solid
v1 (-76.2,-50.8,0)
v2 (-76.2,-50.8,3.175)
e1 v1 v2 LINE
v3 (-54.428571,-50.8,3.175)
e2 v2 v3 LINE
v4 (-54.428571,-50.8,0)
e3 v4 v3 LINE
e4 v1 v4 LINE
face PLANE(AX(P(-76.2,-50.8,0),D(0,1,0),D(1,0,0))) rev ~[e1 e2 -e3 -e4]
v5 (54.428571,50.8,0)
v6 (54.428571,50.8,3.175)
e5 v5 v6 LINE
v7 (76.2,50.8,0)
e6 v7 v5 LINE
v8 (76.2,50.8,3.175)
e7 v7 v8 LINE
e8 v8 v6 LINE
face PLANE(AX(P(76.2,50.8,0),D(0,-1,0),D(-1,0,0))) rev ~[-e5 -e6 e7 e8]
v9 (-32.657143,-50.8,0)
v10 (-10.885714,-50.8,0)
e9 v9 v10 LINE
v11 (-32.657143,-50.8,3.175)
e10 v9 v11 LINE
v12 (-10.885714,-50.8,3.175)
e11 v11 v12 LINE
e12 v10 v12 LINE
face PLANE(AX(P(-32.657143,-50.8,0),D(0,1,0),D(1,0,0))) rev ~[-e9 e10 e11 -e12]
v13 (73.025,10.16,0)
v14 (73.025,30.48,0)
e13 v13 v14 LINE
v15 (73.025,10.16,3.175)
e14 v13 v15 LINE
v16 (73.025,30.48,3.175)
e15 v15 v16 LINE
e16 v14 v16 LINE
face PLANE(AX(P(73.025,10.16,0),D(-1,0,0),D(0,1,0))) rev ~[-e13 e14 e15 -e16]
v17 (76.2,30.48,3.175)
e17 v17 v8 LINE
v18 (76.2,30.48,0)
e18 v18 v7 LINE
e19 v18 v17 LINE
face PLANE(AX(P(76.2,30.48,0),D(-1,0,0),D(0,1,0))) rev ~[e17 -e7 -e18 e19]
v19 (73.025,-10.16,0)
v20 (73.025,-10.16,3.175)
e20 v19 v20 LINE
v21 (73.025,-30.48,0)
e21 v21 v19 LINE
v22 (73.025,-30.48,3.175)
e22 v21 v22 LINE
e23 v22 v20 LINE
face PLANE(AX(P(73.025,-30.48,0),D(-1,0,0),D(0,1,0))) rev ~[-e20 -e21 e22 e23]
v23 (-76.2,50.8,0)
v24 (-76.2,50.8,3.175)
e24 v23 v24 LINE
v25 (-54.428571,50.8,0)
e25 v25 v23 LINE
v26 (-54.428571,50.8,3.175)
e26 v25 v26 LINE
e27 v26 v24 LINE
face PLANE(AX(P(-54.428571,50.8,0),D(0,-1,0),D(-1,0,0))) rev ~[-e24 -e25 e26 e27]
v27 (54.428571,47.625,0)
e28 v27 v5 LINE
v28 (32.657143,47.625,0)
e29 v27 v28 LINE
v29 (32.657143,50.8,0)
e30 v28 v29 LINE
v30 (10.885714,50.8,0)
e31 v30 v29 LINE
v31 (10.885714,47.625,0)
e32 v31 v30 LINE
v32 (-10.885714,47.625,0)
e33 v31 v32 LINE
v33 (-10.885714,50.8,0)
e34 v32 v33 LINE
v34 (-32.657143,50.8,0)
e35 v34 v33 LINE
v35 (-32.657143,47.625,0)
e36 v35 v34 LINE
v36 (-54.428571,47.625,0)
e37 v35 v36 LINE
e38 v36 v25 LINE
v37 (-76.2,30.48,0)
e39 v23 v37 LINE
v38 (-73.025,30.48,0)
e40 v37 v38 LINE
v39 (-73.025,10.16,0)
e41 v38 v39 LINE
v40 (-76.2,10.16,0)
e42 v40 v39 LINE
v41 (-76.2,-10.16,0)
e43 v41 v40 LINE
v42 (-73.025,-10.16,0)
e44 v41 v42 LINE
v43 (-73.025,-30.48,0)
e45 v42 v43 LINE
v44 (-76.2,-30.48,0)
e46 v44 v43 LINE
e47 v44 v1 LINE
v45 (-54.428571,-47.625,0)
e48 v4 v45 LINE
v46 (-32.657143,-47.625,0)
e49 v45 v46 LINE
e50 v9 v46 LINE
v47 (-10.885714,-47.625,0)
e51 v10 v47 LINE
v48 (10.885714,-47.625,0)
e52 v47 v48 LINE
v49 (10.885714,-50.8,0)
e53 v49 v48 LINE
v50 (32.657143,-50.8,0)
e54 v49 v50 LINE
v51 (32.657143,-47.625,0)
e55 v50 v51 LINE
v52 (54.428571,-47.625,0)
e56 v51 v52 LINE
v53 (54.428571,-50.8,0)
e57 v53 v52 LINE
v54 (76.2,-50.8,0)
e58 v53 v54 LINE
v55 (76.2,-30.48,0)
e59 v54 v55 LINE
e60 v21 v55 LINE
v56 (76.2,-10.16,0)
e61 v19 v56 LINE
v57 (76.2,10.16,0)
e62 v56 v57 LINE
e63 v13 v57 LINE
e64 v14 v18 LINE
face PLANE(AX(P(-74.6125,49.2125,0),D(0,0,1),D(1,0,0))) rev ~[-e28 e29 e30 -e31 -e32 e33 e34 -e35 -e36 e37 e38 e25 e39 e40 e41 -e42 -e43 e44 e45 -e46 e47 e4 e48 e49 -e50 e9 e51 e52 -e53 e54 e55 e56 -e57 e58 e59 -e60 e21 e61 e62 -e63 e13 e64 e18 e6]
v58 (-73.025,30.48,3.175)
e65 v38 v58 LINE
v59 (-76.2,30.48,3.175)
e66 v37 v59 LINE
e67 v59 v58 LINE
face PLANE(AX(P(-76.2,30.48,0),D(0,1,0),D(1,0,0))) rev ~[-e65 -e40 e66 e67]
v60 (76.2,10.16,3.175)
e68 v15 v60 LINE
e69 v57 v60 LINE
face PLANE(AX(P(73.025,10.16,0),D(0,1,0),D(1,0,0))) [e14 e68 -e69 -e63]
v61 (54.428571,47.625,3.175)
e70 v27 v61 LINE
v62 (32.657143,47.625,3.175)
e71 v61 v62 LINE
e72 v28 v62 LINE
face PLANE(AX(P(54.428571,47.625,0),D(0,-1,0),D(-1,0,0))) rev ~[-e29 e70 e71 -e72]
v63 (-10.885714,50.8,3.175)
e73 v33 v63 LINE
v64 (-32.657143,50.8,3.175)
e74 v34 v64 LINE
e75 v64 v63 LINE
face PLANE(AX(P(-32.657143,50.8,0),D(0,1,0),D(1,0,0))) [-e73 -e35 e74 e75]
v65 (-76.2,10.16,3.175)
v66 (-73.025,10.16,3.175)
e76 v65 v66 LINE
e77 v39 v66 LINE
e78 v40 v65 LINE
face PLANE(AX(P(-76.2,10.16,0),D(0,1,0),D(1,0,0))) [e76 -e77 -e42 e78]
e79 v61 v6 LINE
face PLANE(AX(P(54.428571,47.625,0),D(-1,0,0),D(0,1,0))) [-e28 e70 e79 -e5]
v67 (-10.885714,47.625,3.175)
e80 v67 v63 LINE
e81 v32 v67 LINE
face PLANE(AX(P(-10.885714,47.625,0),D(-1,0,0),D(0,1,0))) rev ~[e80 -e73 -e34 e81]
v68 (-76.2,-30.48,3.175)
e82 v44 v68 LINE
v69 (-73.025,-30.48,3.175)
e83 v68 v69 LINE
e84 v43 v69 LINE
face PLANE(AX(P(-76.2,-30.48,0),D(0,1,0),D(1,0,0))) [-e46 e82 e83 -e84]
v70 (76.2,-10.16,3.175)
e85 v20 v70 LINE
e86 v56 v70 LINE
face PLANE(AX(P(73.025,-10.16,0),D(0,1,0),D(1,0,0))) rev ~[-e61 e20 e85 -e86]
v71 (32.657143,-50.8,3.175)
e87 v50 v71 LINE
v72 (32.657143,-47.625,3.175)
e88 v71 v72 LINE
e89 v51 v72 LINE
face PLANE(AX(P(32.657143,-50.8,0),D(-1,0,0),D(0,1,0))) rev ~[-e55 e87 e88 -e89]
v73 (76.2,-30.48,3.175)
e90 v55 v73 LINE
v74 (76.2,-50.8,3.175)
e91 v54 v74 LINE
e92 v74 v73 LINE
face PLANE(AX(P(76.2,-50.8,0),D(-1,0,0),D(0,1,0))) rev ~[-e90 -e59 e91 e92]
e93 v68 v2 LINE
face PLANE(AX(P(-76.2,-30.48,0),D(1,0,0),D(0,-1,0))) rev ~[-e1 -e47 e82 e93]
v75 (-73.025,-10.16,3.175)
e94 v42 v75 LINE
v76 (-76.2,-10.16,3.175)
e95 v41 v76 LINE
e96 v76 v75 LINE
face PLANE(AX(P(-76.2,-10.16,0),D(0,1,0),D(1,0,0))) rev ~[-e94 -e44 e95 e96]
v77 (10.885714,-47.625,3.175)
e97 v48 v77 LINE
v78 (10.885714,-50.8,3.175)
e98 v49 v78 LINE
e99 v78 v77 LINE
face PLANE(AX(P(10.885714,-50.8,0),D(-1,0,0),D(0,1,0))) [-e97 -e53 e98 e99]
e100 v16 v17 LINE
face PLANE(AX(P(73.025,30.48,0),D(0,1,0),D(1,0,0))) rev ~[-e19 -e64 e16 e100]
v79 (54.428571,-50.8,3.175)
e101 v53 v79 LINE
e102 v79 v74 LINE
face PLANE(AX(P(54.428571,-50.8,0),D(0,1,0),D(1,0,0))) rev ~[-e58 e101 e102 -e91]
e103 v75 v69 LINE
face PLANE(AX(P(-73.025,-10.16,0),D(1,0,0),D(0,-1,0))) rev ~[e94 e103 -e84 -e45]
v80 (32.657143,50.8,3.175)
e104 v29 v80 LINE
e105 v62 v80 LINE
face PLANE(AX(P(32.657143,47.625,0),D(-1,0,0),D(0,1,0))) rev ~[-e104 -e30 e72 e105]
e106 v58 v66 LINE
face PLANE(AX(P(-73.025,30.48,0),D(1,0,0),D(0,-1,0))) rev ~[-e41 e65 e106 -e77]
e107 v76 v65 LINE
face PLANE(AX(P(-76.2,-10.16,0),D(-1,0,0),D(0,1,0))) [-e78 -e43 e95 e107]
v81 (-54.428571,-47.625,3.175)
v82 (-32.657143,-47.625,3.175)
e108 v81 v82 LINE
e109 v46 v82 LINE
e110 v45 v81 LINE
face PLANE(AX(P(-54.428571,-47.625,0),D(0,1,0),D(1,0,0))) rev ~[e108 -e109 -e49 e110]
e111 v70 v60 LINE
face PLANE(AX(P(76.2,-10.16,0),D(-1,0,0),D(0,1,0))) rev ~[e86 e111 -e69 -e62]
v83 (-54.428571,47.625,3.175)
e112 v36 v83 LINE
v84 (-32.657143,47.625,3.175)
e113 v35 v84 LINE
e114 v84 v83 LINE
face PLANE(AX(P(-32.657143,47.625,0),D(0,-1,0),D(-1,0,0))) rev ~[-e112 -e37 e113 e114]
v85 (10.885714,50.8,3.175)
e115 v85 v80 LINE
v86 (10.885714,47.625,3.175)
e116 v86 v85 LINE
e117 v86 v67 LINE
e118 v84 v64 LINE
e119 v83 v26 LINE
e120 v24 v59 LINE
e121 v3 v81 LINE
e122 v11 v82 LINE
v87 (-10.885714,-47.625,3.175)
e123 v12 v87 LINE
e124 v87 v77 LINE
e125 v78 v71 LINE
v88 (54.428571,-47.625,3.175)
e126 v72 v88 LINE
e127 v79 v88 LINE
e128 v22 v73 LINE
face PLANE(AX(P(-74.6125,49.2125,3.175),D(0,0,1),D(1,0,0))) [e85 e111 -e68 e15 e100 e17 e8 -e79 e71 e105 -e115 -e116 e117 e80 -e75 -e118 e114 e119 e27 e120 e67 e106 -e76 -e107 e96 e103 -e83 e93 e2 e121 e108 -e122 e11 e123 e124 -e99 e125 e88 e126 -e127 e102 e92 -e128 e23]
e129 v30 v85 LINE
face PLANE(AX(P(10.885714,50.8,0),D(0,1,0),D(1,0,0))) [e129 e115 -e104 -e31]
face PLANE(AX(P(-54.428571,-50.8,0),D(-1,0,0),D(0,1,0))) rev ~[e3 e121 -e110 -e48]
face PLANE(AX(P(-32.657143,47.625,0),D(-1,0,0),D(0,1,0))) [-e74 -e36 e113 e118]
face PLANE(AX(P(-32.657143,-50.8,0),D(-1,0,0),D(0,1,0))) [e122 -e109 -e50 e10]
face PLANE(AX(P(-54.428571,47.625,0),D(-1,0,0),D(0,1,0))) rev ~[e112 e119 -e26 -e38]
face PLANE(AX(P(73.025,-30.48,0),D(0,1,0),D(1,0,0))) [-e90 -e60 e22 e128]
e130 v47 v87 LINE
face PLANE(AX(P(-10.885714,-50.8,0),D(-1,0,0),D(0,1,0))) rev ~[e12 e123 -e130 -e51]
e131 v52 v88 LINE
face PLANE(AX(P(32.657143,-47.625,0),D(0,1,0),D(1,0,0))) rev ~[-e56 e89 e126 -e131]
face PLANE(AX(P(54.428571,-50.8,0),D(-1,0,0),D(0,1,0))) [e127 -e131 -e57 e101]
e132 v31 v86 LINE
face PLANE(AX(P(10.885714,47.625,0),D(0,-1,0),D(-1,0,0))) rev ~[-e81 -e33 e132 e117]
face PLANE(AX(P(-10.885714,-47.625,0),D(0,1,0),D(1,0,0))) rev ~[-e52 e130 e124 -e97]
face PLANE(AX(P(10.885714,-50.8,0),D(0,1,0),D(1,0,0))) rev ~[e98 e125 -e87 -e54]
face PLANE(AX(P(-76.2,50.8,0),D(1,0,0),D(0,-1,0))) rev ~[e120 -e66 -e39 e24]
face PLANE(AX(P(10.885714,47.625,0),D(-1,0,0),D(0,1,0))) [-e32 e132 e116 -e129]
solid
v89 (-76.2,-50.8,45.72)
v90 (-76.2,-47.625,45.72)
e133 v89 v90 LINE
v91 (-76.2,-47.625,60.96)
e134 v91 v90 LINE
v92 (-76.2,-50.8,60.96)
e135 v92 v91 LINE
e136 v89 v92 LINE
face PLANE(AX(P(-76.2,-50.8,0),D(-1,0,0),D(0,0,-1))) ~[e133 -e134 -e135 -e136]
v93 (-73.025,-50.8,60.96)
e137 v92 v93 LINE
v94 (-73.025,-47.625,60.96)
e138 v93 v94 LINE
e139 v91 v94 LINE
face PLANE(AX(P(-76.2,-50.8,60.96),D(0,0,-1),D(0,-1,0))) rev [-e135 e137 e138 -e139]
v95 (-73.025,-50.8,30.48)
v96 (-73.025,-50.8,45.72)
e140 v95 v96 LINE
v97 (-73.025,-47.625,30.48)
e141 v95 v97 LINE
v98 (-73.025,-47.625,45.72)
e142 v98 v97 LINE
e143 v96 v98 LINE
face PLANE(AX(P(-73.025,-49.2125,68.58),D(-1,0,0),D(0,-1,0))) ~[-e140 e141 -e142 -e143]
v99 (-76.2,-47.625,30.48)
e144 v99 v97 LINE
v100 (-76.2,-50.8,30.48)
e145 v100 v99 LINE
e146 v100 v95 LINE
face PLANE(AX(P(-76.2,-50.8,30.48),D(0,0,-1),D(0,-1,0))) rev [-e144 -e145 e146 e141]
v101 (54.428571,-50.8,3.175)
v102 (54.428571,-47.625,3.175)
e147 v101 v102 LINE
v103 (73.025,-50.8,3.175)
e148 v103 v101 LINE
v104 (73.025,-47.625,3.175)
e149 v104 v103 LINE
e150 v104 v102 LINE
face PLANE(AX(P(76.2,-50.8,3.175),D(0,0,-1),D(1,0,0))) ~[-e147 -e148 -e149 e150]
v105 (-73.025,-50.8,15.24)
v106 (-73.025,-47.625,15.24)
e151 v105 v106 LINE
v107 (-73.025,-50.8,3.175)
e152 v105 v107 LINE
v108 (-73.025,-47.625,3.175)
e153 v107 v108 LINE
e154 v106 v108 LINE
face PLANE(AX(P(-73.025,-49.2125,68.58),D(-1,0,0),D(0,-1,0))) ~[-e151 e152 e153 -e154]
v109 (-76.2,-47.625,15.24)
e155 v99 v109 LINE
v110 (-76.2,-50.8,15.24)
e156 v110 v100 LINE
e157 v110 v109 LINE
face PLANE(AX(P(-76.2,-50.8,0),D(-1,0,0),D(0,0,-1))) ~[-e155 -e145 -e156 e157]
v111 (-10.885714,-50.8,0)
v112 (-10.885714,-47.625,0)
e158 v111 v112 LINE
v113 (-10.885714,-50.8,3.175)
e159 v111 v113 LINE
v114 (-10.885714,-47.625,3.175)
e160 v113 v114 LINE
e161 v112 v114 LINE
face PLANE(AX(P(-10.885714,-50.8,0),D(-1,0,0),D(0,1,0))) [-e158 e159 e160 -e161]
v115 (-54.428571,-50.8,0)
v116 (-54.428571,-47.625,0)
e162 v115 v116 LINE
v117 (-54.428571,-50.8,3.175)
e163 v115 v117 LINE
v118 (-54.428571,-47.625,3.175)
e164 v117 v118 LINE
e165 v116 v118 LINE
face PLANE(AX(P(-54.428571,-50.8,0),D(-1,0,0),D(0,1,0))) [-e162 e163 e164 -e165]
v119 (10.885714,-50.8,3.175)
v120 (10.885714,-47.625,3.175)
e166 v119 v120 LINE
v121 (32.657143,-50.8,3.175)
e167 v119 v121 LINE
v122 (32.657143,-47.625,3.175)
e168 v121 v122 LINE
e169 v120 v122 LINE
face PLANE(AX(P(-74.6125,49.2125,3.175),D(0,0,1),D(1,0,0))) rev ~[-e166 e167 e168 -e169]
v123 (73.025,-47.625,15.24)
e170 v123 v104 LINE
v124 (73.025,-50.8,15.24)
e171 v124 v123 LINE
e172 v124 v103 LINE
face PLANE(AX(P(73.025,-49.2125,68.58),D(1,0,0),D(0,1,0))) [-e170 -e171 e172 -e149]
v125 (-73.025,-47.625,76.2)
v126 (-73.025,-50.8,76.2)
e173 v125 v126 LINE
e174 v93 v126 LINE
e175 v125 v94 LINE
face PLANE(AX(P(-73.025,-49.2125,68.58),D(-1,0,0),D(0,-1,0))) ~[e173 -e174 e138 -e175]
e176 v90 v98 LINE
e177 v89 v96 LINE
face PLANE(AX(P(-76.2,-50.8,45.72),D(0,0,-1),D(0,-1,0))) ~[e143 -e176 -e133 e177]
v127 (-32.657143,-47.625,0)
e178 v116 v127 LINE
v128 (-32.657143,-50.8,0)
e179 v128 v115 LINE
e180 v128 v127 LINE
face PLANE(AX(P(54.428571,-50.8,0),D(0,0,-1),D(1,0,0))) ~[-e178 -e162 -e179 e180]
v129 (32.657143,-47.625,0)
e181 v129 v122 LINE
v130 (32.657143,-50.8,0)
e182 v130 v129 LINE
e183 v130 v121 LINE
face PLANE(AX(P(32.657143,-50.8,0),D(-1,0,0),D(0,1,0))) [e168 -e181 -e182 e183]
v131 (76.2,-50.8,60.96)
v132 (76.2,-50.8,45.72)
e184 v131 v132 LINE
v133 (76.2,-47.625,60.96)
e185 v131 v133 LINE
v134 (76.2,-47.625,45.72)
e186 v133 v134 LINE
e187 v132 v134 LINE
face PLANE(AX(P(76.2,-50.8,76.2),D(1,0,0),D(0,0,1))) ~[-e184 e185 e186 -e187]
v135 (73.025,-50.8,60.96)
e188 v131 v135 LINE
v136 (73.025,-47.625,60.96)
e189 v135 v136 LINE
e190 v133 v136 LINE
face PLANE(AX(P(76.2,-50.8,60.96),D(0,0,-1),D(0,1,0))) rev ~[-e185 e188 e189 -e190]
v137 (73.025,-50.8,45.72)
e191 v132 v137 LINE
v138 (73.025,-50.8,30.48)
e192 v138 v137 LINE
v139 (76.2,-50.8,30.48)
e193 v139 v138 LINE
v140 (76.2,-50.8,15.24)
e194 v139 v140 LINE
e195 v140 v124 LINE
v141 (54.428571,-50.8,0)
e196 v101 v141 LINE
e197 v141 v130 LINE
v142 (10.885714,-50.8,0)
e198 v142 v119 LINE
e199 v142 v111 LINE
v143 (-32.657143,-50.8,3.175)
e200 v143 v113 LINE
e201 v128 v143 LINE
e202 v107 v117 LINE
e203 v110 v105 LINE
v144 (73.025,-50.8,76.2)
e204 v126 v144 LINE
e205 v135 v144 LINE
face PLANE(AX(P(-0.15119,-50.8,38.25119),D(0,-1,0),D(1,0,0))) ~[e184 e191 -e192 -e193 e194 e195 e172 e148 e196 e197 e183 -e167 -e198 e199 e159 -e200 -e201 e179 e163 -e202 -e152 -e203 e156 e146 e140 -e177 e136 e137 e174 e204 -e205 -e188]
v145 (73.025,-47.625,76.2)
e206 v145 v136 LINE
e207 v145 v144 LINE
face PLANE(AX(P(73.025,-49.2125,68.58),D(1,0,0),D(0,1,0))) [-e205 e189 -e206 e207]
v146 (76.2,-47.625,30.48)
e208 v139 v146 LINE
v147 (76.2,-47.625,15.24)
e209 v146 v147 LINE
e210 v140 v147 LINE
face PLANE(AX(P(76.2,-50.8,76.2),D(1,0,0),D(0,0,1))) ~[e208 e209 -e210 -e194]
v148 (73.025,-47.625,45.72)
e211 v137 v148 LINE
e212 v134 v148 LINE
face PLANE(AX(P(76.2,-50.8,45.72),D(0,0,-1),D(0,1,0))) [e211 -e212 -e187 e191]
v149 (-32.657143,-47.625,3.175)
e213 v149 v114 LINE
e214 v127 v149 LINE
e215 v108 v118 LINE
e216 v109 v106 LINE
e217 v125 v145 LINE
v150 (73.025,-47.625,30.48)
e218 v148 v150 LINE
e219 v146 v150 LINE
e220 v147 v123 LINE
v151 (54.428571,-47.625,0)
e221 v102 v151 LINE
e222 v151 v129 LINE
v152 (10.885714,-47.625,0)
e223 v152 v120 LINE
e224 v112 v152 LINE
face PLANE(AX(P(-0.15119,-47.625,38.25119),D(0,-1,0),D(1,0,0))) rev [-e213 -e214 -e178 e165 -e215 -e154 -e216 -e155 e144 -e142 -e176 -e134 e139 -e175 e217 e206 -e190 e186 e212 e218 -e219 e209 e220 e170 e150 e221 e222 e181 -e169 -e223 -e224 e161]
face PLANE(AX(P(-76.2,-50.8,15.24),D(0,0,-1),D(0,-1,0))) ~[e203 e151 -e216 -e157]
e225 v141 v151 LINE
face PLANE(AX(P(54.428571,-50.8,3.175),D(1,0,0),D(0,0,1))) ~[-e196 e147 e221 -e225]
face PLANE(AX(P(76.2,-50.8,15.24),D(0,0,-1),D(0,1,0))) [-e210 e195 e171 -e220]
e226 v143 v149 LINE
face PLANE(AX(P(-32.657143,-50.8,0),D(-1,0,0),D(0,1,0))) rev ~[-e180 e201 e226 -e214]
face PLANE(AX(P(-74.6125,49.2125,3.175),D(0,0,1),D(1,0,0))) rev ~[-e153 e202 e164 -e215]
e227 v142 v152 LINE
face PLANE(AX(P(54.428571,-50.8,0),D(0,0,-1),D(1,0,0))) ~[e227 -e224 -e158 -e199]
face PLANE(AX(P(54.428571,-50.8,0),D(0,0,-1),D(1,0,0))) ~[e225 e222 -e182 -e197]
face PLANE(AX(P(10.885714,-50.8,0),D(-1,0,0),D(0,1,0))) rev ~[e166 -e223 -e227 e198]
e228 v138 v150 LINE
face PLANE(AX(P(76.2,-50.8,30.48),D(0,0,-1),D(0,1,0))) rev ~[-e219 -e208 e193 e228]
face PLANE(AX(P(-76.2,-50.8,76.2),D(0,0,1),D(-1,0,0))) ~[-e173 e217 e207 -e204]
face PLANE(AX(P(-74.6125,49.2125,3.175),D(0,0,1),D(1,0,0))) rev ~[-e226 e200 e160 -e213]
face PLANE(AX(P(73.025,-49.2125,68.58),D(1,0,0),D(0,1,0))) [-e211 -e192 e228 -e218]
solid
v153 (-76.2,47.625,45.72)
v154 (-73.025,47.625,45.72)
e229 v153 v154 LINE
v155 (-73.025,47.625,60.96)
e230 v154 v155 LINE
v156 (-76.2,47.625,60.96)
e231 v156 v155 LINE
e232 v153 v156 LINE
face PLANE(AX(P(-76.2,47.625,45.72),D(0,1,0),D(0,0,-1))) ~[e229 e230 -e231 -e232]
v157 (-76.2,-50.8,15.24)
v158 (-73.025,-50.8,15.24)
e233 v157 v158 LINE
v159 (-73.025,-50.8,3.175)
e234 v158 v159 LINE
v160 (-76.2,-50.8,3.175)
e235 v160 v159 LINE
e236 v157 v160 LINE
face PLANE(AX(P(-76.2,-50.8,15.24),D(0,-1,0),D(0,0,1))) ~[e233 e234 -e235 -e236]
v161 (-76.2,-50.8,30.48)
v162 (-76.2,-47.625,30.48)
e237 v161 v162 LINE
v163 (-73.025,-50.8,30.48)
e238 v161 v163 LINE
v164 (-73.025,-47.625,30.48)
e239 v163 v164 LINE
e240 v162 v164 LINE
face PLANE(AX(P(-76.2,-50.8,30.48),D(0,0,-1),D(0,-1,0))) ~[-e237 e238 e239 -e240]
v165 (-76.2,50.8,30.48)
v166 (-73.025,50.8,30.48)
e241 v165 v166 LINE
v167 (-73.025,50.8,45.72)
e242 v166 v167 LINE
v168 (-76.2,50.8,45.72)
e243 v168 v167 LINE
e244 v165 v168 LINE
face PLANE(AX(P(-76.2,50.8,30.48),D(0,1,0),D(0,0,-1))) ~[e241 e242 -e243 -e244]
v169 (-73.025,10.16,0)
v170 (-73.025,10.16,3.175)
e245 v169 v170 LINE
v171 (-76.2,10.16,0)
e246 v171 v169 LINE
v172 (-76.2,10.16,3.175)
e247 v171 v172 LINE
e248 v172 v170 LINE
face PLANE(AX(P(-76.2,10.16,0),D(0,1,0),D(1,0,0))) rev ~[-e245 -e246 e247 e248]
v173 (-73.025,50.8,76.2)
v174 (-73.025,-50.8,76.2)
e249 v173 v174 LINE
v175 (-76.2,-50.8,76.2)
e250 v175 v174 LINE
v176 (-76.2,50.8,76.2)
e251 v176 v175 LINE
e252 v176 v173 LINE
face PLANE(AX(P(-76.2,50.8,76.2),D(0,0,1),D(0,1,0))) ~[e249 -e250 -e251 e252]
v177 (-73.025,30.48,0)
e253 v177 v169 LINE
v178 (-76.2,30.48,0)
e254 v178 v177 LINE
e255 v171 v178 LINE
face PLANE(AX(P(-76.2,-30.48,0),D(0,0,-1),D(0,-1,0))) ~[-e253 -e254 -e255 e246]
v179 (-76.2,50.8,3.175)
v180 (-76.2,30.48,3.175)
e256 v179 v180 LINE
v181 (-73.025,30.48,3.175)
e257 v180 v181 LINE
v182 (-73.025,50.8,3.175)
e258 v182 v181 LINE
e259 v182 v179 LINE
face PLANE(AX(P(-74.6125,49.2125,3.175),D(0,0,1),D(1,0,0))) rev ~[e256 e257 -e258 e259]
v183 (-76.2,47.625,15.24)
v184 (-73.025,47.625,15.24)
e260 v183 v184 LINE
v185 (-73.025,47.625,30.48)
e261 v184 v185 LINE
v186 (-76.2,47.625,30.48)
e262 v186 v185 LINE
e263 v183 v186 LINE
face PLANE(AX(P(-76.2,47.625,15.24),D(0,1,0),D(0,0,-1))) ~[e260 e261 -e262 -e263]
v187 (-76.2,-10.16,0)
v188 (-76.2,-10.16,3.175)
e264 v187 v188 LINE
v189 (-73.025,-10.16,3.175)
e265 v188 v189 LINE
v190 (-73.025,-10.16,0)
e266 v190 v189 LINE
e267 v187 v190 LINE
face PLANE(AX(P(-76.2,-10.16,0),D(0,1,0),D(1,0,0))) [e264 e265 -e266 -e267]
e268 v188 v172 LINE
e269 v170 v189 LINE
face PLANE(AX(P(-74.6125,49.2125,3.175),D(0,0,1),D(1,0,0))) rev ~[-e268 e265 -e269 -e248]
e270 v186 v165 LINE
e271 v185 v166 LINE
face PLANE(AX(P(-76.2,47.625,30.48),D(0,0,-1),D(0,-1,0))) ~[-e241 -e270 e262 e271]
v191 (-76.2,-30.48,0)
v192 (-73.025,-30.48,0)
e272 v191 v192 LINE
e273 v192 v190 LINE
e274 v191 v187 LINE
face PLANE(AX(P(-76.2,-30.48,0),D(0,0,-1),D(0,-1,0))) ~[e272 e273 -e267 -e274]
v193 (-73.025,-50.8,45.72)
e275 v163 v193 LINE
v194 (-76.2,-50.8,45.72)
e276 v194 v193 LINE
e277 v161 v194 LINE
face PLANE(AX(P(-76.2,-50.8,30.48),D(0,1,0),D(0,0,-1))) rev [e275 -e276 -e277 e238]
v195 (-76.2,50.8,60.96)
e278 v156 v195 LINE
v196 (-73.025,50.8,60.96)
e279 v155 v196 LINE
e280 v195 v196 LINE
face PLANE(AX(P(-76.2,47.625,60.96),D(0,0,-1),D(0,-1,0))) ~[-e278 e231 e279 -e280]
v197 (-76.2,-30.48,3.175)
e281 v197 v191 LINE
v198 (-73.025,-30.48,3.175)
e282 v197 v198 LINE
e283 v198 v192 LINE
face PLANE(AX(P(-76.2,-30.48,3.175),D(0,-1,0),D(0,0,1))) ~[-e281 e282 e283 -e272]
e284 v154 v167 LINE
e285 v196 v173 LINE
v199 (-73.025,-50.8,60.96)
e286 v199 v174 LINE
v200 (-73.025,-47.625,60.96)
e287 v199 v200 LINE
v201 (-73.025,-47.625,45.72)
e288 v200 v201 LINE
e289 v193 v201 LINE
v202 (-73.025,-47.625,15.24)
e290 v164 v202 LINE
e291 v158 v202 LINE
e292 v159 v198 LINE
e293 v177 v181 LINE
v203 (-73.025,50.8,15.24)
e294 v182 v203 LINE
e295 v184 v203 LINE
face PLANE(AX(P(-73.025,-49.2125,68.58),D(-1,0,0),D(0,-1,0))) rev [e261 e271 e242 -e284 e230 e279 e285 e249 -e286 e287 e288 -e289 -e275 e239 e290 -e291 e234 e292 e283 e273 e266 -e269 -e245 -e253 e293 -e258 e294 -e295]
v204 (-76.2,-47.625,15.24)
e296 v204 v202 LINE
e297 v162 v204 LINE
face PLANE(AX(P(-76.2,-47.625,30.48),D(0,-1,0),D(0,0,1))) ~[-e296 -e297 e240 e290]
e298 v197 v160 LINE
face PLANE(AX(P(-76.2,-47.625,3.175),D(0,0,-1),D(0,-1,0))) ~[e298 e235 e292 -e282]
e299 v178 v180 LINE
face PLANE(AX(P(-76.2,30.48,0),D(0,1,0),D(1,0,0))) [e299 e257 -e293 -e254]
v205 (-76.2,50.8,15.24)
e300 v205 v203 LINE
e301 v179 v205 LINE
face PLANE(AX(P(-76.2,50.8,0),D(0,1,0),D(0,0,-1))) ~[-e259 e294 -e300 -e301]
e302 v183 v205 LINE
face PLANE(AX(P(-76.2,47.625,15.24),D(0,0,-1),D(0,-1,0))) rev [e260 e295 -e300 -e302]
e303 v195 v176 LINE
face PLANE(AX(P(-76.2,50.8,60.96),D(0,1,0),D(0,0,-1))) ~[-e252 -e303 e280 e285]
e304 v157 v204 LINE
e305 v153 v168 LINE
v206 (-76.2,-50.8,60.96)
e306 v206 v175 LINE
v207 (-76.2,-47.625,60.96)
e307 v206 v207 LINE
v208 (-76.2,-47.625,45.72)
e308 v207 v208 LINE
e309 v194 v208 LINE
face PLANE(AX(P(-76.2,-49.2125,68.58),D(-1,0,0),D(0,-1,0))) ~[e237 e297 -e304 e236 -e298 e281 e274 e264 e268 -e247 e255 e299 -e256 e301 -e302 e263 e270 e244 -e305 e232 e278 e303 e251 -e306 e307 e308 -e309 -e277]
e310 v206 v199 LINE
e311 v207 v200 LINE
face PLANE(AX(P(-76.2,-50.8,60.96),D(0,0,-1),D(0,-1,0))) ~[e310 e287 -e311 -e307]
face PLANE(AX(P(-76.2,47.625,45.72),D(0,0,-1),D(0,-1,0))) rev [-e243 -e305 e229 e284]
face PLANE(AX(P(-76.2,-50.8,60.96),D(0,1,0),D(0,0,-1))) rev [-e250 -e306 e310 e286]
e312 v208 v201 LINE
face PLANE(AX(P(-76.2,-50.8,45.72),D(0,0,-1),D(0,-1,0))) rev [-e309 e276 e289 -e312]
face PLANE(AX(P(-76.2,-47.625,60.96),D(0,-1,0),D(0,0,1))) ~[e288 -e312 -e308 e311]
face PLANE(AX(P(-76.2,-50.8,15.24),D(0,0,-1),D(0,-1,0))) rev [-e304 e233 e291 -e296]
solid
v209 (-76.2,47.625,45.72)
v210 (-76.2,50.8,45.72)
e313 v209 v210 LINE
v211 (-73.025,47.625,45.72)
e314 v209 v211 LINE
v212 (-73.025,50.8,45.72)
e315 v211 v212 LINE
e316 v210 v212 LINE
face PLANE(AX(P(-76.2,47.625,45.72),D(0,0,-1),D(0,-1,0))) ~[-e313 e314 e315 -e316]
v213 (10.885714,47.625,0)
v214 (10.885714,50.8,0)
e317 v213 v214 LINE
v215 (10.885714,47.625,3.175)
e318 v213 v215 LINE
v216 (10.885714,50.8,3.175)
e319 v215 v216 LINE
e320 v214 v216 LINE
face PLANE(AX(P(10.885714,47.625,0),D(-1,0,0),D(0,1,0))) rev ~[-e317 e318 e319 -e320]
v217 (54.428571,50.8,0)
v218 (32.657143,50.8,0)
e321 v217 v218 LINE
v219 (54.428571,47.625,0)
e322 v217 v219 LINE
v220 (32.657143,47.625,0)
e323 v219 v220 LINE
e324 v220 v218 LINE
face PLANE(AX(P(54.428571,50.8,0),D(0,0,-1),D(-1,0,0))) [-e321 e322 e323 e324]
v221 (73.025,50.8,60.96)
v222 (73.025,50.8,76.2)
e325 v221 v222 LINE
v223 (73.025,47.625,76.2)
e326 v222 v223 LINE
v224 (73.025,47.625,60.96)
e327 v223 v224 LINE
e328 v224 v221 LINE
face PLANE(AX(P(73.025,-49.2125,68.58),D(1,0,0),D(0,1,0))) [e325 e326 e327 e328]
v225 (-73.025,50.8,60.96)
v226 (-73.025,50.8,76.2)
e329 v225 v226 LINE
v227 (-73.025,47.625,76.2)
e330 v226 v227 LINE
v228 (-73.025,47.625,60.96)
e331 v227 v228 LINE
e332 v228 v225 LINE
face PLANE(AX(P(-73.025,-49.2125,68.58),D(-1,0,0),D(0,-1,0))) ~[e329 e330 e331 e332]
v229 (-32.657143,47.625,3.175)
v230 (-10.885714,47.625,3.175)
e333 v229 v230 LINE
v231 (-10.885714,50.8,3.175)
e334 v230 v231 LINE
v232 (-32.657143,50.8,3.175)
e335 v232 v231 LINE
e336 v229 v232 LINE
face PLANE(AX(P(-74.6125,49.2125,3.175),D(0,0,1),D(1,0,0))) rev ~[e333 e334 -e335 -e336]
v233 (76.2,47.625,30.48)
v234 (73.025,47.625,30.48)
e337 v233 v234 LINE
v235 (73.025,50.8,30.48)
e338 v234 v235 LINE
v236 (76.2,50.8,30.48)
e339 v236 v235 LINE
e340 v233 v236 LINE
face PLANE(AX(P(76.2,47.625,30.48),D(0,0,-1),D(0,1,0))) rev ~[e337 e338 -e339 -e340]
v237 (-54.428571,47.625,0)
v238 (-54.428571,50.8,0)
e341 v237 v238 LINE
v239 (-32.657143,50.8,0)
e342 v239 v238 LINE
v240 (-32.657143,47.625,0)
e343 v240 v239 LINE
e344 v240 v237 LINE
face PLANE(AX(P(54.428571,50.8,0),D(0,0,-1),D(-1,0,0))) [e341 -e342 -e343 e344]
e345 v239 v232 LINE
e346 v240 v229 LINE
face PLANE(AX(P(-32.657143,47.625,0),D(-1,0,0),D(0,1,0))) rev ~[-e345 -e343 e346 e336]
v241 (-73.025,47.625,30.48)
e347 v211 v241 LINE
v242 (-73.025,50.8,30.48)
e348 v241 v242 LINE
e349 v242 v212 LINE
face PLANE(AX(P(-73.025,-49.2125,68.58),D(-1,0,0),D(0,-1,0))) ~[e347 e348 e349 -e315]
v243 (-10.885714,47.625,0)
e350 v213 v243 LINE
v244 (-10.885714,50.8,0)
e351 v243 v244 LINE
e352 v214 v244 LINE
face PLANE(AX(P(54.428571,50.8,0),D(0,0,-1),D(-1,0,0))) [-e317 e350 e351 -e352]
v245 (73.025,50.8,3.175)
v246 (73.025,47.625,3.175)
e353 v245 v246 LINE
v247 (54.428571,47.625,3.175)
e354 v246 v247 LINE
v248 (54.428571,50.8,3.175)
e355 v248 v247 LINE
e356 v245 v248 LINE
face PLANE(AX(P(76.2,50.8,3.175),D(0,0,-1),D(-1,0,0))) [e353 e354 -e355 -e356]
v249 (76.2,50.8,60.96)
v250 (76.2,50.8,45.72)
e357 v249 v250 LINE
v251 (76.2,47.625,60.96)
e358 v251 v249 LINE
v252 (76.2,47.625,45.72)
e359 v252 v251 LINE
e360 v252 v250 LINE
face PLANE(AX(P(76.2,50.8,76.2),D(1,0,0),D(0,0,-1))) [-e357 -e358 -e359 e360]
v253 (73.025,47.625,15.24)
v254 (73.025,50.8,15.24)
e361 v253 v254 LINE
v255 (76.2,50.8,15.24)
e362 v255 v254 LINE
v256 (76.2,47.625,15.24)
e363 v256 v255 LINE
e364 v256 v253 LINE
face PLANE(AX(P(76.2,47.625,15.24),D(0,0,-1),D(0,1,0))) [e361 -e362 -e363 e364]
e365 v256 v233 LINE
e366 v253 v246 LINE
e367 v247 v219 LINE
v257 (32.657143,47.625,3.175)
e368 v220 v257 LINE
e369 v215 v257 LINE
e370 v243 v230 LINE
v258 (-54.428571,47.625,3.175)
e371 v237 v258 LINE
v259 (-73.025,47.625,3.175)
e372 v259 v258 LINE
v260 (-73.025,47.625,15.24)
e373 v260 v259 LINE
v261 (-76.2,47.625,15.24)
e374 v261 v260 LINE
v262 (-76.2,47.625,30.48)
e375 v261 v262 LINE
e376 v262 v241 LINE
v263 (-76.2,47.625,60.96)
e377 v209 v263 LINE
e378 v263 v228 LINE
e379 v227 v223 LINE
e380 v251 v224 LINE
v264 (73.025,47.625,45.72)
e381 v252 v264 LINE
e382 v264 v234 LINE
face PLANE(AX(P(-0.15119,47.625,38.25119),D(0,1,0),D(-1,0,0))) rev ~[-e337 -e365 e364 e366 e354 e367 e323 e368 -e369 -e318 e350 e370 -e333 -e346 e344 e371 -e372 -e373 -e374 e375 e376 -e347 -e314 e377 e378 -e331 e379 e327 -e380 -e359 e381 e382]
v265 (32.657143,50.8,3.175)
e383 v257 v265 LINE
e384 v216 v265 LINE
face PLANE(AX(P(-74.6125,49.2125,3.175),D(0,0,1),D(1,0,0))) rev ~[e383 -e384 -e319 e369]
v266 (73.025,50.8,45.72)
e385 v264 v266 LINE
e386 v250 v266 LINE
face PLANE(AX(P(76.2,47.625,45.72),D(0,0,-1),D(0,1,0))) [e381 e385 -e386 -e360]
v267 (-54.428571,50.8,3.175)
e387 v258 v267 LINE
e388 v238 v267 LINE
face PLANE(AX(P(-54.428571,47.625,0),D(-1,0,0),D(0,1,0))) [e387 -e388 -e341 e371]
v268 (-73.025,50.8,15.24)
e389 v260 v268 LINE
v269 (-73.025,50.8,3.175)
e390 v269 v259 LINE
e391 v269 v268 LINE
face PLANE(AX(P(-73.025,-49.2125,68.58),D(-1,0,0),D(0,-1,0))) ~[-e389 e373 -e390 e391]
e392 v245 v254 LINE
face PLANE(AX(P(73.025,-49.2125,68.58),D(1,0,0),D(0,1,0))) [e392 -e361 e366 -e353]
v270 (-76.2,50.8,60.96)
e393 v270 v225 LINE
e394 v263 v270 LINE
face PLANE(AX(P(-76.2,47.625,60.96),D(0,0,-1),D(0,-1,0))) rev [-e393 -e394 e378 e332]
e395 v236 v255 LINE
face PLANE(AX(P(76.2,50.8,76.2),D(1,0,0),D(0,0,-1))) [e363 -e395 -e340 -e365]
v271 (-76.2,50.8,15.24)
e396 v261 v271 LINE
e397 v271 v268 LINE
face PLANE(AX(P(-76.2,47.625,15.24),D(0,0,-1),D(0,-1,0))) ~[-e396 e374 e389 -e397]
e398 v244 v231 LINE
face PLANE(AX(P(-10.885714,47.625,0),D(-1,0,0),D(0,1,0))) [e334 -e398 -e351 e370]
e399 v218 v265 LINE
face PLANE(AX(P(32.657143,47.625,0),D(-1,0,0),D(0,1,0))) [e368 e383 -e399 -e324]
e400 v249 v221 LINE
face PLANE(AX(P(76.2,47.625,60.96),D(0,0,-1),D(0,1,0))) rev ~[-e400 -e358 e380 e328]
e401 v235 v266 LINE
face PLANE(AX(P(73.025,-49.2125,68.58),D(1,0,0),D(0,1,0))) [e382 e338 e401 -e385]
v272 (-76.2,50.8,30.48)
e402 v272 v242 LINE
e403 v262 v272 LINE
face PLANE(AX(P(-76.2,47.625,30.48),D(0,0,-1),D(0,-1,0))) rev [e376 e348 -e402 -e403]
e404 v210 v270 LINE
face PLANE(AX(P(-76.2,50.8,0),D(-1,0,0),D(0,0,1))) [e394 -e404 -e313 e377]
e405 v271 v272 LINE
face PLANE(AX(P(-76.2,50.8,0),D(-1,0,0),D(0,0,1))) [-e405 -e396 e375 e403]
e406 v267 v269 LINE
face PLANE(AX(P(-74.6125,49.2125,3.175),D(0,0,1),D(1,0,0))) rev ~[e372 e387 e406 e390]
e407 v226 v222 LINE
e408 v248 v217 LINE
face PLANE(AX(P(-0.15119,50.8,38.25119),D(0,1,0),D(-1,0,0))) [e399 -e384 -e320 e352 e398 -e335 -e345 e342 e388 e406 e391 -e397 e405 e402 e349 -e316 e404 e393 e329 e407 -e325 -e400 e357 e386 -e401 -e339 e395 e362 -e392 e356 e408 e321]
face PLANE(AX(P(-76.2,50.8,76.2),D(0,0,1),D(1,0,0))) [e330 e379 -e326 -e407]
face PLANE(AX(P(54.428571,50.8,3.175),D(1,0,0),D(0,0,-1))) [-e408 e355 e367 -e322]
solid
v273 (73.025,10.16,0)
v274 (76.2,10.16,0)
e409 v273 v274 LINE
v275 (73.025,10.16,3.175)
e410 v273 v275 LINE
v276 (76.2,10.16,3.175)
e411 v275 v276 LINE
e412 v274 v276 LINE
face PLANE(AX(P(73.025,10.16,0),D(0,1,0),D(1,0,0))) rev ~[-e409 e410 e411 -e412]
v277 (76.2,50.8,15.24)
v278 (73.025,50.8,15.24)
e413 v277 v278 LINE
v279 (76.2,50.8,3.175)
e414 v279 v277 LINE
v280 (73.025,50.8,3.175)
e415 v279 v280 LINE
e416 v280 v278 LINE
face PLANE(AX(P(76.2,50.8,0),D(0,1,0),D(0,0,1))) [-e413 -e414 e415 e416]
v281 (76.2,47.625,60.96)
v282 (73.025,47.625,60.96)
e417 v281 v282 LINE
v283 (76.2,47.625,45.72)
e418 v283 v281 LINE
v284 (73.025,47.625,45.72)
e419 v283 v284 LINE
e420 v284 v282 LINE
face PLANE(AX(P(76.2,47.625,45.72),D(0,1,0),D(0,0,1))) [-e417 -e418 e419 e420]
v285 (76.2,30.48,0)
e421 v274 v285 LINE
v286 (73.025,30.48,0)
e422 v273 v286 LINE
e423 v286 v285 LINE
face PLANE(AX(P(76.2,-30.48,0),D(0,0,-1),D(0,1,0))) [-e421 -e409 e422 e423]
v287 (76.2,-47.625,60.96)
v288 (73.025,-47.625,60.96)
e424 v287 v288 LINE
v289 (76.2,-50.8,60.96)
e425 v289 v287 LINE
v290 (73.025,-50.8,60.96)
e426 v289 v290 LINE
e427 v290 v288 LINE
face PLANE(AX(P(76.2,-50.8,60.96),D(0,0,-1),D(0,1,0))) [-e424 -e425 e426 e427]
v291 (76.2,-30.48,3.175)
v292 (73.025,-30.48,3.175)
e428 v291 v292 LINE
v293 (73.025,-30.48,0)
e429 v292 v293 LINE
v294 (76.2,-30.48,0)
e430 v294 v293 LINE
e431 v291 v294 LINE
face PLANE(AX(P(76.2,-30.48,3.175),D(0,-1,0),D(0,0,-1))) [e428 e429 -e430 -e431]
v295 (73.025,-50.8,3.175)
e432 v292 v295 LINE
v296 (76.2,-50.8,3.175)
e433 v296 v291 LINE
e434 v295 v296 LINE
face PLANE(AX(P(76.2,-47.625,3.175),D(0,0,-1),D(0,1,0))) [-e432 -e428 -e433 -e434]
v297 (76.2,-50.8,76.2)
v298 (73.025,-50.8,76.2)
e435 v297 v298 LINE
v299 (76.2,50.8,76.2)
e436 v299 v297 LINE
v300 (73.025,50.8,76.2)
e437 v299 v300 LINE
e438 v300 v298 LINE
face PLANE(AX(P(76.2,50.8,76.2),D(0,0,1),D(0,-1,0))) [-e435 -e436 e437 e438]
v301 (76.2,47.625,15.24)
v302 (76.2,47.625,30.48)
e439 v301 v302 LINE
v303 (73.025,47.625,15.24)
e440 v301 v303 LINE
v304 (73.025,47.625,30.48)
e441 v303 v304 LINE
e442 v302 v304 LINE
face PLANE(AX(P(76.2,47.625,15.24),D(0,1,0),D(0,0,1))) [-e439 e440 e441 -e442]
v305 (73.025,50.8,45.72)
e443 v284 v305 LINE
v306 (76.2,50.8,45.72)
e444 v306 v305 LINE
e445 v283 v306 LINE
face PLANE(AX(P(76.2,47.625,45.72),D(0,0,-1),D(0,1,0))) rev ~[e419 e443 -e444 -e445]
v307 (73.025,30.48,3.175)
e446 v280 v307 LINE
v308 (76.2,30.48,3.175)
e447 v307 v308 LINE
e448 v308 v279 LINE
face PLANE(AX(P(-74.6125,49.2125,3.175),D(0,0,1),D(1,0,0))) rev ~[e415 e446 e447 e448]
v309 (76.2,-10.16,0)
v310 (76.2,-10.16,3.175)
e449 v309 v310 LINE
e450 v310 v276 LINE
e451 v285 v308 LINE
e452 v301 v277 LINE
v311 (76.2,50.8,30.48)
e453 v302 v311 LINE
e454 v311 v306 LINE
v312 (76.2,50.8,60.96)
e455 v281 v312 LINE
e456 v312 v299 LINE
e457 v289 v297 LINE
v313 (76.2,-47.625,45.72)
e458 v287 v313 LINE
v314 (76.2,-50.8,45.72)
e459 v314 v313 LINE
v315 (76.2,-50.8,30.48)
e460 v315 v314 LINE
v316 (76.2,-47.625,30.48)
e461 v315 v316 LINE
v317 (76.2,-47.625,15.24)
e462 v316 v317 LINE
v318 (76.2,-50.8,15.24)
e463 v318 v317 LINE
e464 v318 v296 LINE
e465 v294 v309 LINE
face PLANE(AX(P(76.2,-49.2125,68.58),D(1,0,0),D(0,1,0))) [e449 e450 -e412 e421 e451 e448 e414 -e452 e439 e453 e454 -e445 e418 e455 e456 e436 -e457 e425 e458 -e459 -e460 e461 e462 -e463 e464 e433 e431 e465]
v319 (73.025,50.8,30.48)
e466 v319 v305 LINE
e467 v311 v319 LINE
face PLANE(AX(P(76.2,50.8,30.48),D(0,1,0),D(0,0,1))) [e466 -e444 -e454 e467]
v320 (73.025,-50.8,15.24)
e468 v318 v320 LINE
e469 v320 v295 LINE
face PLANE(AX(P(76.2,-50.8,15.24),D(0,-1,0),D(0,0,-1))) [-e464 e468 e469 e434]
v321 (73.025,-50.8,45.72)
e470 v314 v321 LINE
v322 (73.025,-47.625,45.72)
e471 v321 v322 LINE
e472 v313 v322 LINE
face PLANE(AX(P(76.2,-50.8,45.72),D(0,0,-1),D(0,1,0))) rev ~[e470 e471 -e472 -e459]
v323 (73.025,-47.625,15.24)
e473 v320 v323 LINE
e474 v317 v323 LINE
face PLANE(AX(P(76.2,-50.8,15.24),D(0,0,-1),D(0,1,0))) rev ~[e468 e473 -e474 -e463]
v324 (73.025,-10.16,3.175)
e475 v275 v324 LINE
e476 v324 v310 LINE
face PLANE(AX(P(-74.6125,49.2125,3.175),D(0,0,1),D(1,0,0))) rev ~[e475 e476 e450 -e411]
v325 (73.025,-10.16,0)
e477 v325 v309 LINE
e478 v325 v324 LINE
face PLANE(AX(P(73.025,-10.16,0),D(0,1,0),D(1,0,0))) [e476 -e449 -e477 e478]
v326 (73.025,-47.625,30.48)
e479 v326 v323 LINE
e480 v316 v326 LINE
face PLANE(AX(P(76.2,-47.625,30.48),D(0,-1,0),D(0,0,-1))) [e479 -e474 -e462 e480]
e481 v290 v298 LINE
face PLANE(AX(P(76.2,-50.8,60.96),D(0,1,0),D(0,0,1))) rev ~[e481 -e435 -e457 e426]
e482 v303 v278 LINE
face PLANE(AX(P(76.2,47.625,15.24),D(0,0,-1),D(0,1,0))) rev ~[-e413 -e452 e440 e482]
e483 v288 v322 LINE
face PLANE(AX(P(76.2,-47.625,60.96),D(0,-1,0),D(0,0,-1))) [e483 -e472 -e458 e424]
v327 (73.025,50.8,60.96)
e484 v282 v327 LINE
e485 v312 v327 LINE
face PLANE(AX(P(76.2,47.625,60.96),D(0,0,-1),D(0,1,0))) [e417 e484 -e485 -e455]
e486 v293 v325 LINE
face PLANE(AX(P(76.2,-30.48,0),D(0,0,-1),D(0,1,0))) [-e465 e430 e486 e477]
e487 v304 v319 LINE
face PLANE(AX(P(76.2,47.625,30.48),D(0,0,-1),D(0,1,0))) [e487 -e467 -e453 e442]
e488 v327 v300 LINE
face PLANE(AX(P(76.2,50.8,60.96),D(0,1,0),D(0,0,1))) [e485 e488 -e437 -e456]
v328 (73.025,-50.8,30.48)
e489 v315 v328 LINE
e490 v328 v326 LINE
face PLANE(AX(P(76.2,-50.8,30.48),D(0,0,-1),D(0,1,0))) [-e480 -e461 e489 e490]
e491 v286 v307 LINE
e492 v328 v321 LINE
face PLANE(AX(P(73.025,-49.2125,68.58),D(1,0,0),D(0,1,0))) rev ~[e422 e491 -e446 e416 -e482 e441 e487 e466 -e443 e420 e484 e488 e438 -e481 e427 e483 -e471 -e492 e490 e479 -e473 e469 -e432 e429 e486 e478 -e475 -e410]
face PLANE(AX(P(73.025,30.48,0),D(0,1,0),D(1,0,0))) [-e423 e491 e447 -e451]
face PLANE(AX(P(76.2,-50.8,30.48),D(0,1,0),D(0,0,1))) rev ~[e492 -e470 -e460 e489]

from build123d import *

# Parameters (mm, degrees)
F0_W     = 3.175
F0_H     = 3.175
F0_W_2   = 18.5964285714
F0_H_2   = 17.145
F0_H_3   = 20.32
F0_W_3   = 21.7714285714
F1_DEPTH = 3.175
F2_W     = 3.175
F2_H     = 15.24
F2_H_2   = 12.065
F2_H_3   = 3.175
F3_DEPTH = 3.175
F7_DEPTH = 3.175


with BuildPart() as f1:
    # F0 (on Top) → F1 (new body)
    with BuildSketch(Plane.XY):
        with Locations((-74.6125, 49.2125)):
            Rectangle(F0_W, F0_H)
        with Locations((-63.7267857143, 49.2125)):
            Rectangle(F0_W_2, F0_H)
        with Locations((-74.6125, 39.0525)):
            Rectangle(F0_W, F0_H_2)
        Polygon((73.025, 30.48), (73.025, 47.625), (54.4285714286, 47.625), (32.6571428571, 47.625), (10.8857142857, 47.625), (-10.8857142857, 47.625), (-32.6571428571, 47.625), (-54.4285714286, 47.625), (-73.025, 47.625), (-73.025, 30.48), (-73.025, 10.16), (-73.025, -10.16), (-73.025, -30.48), (-73.025, -47.625), (-54.4285714286, -47.625), (-32.6571428571, -47.625), (-10.8857142857, -47.625), (10.8857142857, -47.625), (32.6571428571, -47.625), (54.4285714286, -47.625), (73.025, -47.625), (73.025, -30.48), (73.025, -10.16), (73.025, 10.16), align=None)
        with Locations((-74.6125, 0)):
            Rectangle(F0_W, F0_H_3)
        with Locations((-74.6125, -39.0525)):
            Rectangle(F0_W, F0_H_2)
        with Locations((-74.6125, -49.2125)):
            Rectangle(F0_W, F0_H)
        with Locations((-63.7267857143, -49.2125)):
            Rectangle(F0_W_2, F0_H)
        with Locations((-21.7714285714, -49.2125)):
            Rectangle(F0_W_3, F0_H)
        with Locations((21.7714285714, -49.2125)):
            Rectangle(F0_W_3, F0_H)
        with Locations((63.7267857143, -49.2125)):
            Rectangle(F0_W_2, F0_H)
        with Locations((74.6125, -49.2125)):
            Rectangle(F0_W, F0_H)
        with Locations((74.6125, -39.0525)):
            Rectangle(F0_W, F0_H_2)
        with Locations((74.6125, 0)):
            Rectangle(F0_W, F0_H_3)
        with Locations((74.6125, 39.0525)):
            Rectangle(F0_W, F0_H_2)
        with Locations((74.6125, 49.2125)):
            Rectangle(F0_W, F0_H)
        with Locations((63.7267857143, 49.2125)):
            Rectangle(F0_W_2, F0_H)
        with Locations((21.7714285714, 49.2125)):
            Rectangle(F0_W_3, F0_H)
        with Locations((-21.7714285714, 49.2125)):
            Rectangle(F0_W_3, F0_H)
    extrude(amount=F1_DEPTH)


with BuildPart() as f3:
    # F2 (on face) → F3 (new body)
    with BuildSketch(Plane.YZ.offset(76.2)):
        with Locations((-49.2125, 68.58)):
            Rectangle(F2_W, F2_H)
        Polygon((-30.48, 3.175), (-30.48, 0), (47.625, 0), (47.625, 15.24), (47.625, 30.48), (47.625, 45.72), (47.625, 60.96), (47.625, 76.2), (-47.625, 76.2), (-47.625, 60.96), (-47.625, 45.72), (-47.625, 30.48), (-47.625, 15.24), (-47.625, 3.175), align=None)
        with Locations((-49.2125, 38.1)):
            Rectangle(F2_W, F2_H)
        with Locations((-49.2125, 9.2075)):
            Rectangle(F2_W, F2_H_2)
        with Locations((-49.2125, 1.5875)):
            Rectangle(F2_W, F2_H_3)
        with Locations((49.2125, 7.62)):
            Rectangle(F2_W, F2_H)
        with Locations((49.2125, 38.1)):
            Rectangle(F2_W, F2_H)
        with Locations((49.2125, 68.58)):
            Rectangle(F2_W, F2_H)
    extrude(amount=-F3_DEPTH)


with BuildPart() as f4_1:
    # F4: instance of F3
    add(f3.part.mirror(Plane.YZ))

    # F5: cut F1
    add(f1.part, mode=Mode.SUBTRACT)


with BuildPart() as f3_1:
    add(f3.part)

    # F5: cut F1
    add(f1.part, mode=Mode.SUBTRACT)


with BuildPart() as f7:
    # F6 (on face) → F7 (new body)
    with BuildSketch(Plane(origin=(0, 50.8, 0), x_dir=(-1, 0, 0), z_dir=(0, 1, 0))):
        Polygon((-54.4285714286, 3.175), (-54.4285714286, 0), (76.2, 0), (76.2, 76.2), (-76.2, 76.2), (-76.2, 3.175), align=None)
    extrude(amount=-F7_DEPTH)


with BuildPart() as f8_1:
    # F8: instance of F7
    add(f7.part.mirror(Plane.XZ))

    # F9: cut F3, F4_1, F1
    add(f3_1.part, mode=Mode.SUBTRACT)
    add(f4_1.part, mode=Mode.SUBTRACT)
    add(f1.part, mode=Mode.SUBTRACT)


with BuildPart() as f7_1:
    add(f7.part)

    # F9: cut F3, F4_1, F1
    add(f3_1.part, mode=Mode.SUBTRACT)
    add(f4_1.part, mode=Mode.SUBTRACT)
    add(f1.part, mode=Mode.SUBTRACT)


solid = Compound([f1.part, f4_1.part, f3_1.part, f8_1.part, f7_1.part])
